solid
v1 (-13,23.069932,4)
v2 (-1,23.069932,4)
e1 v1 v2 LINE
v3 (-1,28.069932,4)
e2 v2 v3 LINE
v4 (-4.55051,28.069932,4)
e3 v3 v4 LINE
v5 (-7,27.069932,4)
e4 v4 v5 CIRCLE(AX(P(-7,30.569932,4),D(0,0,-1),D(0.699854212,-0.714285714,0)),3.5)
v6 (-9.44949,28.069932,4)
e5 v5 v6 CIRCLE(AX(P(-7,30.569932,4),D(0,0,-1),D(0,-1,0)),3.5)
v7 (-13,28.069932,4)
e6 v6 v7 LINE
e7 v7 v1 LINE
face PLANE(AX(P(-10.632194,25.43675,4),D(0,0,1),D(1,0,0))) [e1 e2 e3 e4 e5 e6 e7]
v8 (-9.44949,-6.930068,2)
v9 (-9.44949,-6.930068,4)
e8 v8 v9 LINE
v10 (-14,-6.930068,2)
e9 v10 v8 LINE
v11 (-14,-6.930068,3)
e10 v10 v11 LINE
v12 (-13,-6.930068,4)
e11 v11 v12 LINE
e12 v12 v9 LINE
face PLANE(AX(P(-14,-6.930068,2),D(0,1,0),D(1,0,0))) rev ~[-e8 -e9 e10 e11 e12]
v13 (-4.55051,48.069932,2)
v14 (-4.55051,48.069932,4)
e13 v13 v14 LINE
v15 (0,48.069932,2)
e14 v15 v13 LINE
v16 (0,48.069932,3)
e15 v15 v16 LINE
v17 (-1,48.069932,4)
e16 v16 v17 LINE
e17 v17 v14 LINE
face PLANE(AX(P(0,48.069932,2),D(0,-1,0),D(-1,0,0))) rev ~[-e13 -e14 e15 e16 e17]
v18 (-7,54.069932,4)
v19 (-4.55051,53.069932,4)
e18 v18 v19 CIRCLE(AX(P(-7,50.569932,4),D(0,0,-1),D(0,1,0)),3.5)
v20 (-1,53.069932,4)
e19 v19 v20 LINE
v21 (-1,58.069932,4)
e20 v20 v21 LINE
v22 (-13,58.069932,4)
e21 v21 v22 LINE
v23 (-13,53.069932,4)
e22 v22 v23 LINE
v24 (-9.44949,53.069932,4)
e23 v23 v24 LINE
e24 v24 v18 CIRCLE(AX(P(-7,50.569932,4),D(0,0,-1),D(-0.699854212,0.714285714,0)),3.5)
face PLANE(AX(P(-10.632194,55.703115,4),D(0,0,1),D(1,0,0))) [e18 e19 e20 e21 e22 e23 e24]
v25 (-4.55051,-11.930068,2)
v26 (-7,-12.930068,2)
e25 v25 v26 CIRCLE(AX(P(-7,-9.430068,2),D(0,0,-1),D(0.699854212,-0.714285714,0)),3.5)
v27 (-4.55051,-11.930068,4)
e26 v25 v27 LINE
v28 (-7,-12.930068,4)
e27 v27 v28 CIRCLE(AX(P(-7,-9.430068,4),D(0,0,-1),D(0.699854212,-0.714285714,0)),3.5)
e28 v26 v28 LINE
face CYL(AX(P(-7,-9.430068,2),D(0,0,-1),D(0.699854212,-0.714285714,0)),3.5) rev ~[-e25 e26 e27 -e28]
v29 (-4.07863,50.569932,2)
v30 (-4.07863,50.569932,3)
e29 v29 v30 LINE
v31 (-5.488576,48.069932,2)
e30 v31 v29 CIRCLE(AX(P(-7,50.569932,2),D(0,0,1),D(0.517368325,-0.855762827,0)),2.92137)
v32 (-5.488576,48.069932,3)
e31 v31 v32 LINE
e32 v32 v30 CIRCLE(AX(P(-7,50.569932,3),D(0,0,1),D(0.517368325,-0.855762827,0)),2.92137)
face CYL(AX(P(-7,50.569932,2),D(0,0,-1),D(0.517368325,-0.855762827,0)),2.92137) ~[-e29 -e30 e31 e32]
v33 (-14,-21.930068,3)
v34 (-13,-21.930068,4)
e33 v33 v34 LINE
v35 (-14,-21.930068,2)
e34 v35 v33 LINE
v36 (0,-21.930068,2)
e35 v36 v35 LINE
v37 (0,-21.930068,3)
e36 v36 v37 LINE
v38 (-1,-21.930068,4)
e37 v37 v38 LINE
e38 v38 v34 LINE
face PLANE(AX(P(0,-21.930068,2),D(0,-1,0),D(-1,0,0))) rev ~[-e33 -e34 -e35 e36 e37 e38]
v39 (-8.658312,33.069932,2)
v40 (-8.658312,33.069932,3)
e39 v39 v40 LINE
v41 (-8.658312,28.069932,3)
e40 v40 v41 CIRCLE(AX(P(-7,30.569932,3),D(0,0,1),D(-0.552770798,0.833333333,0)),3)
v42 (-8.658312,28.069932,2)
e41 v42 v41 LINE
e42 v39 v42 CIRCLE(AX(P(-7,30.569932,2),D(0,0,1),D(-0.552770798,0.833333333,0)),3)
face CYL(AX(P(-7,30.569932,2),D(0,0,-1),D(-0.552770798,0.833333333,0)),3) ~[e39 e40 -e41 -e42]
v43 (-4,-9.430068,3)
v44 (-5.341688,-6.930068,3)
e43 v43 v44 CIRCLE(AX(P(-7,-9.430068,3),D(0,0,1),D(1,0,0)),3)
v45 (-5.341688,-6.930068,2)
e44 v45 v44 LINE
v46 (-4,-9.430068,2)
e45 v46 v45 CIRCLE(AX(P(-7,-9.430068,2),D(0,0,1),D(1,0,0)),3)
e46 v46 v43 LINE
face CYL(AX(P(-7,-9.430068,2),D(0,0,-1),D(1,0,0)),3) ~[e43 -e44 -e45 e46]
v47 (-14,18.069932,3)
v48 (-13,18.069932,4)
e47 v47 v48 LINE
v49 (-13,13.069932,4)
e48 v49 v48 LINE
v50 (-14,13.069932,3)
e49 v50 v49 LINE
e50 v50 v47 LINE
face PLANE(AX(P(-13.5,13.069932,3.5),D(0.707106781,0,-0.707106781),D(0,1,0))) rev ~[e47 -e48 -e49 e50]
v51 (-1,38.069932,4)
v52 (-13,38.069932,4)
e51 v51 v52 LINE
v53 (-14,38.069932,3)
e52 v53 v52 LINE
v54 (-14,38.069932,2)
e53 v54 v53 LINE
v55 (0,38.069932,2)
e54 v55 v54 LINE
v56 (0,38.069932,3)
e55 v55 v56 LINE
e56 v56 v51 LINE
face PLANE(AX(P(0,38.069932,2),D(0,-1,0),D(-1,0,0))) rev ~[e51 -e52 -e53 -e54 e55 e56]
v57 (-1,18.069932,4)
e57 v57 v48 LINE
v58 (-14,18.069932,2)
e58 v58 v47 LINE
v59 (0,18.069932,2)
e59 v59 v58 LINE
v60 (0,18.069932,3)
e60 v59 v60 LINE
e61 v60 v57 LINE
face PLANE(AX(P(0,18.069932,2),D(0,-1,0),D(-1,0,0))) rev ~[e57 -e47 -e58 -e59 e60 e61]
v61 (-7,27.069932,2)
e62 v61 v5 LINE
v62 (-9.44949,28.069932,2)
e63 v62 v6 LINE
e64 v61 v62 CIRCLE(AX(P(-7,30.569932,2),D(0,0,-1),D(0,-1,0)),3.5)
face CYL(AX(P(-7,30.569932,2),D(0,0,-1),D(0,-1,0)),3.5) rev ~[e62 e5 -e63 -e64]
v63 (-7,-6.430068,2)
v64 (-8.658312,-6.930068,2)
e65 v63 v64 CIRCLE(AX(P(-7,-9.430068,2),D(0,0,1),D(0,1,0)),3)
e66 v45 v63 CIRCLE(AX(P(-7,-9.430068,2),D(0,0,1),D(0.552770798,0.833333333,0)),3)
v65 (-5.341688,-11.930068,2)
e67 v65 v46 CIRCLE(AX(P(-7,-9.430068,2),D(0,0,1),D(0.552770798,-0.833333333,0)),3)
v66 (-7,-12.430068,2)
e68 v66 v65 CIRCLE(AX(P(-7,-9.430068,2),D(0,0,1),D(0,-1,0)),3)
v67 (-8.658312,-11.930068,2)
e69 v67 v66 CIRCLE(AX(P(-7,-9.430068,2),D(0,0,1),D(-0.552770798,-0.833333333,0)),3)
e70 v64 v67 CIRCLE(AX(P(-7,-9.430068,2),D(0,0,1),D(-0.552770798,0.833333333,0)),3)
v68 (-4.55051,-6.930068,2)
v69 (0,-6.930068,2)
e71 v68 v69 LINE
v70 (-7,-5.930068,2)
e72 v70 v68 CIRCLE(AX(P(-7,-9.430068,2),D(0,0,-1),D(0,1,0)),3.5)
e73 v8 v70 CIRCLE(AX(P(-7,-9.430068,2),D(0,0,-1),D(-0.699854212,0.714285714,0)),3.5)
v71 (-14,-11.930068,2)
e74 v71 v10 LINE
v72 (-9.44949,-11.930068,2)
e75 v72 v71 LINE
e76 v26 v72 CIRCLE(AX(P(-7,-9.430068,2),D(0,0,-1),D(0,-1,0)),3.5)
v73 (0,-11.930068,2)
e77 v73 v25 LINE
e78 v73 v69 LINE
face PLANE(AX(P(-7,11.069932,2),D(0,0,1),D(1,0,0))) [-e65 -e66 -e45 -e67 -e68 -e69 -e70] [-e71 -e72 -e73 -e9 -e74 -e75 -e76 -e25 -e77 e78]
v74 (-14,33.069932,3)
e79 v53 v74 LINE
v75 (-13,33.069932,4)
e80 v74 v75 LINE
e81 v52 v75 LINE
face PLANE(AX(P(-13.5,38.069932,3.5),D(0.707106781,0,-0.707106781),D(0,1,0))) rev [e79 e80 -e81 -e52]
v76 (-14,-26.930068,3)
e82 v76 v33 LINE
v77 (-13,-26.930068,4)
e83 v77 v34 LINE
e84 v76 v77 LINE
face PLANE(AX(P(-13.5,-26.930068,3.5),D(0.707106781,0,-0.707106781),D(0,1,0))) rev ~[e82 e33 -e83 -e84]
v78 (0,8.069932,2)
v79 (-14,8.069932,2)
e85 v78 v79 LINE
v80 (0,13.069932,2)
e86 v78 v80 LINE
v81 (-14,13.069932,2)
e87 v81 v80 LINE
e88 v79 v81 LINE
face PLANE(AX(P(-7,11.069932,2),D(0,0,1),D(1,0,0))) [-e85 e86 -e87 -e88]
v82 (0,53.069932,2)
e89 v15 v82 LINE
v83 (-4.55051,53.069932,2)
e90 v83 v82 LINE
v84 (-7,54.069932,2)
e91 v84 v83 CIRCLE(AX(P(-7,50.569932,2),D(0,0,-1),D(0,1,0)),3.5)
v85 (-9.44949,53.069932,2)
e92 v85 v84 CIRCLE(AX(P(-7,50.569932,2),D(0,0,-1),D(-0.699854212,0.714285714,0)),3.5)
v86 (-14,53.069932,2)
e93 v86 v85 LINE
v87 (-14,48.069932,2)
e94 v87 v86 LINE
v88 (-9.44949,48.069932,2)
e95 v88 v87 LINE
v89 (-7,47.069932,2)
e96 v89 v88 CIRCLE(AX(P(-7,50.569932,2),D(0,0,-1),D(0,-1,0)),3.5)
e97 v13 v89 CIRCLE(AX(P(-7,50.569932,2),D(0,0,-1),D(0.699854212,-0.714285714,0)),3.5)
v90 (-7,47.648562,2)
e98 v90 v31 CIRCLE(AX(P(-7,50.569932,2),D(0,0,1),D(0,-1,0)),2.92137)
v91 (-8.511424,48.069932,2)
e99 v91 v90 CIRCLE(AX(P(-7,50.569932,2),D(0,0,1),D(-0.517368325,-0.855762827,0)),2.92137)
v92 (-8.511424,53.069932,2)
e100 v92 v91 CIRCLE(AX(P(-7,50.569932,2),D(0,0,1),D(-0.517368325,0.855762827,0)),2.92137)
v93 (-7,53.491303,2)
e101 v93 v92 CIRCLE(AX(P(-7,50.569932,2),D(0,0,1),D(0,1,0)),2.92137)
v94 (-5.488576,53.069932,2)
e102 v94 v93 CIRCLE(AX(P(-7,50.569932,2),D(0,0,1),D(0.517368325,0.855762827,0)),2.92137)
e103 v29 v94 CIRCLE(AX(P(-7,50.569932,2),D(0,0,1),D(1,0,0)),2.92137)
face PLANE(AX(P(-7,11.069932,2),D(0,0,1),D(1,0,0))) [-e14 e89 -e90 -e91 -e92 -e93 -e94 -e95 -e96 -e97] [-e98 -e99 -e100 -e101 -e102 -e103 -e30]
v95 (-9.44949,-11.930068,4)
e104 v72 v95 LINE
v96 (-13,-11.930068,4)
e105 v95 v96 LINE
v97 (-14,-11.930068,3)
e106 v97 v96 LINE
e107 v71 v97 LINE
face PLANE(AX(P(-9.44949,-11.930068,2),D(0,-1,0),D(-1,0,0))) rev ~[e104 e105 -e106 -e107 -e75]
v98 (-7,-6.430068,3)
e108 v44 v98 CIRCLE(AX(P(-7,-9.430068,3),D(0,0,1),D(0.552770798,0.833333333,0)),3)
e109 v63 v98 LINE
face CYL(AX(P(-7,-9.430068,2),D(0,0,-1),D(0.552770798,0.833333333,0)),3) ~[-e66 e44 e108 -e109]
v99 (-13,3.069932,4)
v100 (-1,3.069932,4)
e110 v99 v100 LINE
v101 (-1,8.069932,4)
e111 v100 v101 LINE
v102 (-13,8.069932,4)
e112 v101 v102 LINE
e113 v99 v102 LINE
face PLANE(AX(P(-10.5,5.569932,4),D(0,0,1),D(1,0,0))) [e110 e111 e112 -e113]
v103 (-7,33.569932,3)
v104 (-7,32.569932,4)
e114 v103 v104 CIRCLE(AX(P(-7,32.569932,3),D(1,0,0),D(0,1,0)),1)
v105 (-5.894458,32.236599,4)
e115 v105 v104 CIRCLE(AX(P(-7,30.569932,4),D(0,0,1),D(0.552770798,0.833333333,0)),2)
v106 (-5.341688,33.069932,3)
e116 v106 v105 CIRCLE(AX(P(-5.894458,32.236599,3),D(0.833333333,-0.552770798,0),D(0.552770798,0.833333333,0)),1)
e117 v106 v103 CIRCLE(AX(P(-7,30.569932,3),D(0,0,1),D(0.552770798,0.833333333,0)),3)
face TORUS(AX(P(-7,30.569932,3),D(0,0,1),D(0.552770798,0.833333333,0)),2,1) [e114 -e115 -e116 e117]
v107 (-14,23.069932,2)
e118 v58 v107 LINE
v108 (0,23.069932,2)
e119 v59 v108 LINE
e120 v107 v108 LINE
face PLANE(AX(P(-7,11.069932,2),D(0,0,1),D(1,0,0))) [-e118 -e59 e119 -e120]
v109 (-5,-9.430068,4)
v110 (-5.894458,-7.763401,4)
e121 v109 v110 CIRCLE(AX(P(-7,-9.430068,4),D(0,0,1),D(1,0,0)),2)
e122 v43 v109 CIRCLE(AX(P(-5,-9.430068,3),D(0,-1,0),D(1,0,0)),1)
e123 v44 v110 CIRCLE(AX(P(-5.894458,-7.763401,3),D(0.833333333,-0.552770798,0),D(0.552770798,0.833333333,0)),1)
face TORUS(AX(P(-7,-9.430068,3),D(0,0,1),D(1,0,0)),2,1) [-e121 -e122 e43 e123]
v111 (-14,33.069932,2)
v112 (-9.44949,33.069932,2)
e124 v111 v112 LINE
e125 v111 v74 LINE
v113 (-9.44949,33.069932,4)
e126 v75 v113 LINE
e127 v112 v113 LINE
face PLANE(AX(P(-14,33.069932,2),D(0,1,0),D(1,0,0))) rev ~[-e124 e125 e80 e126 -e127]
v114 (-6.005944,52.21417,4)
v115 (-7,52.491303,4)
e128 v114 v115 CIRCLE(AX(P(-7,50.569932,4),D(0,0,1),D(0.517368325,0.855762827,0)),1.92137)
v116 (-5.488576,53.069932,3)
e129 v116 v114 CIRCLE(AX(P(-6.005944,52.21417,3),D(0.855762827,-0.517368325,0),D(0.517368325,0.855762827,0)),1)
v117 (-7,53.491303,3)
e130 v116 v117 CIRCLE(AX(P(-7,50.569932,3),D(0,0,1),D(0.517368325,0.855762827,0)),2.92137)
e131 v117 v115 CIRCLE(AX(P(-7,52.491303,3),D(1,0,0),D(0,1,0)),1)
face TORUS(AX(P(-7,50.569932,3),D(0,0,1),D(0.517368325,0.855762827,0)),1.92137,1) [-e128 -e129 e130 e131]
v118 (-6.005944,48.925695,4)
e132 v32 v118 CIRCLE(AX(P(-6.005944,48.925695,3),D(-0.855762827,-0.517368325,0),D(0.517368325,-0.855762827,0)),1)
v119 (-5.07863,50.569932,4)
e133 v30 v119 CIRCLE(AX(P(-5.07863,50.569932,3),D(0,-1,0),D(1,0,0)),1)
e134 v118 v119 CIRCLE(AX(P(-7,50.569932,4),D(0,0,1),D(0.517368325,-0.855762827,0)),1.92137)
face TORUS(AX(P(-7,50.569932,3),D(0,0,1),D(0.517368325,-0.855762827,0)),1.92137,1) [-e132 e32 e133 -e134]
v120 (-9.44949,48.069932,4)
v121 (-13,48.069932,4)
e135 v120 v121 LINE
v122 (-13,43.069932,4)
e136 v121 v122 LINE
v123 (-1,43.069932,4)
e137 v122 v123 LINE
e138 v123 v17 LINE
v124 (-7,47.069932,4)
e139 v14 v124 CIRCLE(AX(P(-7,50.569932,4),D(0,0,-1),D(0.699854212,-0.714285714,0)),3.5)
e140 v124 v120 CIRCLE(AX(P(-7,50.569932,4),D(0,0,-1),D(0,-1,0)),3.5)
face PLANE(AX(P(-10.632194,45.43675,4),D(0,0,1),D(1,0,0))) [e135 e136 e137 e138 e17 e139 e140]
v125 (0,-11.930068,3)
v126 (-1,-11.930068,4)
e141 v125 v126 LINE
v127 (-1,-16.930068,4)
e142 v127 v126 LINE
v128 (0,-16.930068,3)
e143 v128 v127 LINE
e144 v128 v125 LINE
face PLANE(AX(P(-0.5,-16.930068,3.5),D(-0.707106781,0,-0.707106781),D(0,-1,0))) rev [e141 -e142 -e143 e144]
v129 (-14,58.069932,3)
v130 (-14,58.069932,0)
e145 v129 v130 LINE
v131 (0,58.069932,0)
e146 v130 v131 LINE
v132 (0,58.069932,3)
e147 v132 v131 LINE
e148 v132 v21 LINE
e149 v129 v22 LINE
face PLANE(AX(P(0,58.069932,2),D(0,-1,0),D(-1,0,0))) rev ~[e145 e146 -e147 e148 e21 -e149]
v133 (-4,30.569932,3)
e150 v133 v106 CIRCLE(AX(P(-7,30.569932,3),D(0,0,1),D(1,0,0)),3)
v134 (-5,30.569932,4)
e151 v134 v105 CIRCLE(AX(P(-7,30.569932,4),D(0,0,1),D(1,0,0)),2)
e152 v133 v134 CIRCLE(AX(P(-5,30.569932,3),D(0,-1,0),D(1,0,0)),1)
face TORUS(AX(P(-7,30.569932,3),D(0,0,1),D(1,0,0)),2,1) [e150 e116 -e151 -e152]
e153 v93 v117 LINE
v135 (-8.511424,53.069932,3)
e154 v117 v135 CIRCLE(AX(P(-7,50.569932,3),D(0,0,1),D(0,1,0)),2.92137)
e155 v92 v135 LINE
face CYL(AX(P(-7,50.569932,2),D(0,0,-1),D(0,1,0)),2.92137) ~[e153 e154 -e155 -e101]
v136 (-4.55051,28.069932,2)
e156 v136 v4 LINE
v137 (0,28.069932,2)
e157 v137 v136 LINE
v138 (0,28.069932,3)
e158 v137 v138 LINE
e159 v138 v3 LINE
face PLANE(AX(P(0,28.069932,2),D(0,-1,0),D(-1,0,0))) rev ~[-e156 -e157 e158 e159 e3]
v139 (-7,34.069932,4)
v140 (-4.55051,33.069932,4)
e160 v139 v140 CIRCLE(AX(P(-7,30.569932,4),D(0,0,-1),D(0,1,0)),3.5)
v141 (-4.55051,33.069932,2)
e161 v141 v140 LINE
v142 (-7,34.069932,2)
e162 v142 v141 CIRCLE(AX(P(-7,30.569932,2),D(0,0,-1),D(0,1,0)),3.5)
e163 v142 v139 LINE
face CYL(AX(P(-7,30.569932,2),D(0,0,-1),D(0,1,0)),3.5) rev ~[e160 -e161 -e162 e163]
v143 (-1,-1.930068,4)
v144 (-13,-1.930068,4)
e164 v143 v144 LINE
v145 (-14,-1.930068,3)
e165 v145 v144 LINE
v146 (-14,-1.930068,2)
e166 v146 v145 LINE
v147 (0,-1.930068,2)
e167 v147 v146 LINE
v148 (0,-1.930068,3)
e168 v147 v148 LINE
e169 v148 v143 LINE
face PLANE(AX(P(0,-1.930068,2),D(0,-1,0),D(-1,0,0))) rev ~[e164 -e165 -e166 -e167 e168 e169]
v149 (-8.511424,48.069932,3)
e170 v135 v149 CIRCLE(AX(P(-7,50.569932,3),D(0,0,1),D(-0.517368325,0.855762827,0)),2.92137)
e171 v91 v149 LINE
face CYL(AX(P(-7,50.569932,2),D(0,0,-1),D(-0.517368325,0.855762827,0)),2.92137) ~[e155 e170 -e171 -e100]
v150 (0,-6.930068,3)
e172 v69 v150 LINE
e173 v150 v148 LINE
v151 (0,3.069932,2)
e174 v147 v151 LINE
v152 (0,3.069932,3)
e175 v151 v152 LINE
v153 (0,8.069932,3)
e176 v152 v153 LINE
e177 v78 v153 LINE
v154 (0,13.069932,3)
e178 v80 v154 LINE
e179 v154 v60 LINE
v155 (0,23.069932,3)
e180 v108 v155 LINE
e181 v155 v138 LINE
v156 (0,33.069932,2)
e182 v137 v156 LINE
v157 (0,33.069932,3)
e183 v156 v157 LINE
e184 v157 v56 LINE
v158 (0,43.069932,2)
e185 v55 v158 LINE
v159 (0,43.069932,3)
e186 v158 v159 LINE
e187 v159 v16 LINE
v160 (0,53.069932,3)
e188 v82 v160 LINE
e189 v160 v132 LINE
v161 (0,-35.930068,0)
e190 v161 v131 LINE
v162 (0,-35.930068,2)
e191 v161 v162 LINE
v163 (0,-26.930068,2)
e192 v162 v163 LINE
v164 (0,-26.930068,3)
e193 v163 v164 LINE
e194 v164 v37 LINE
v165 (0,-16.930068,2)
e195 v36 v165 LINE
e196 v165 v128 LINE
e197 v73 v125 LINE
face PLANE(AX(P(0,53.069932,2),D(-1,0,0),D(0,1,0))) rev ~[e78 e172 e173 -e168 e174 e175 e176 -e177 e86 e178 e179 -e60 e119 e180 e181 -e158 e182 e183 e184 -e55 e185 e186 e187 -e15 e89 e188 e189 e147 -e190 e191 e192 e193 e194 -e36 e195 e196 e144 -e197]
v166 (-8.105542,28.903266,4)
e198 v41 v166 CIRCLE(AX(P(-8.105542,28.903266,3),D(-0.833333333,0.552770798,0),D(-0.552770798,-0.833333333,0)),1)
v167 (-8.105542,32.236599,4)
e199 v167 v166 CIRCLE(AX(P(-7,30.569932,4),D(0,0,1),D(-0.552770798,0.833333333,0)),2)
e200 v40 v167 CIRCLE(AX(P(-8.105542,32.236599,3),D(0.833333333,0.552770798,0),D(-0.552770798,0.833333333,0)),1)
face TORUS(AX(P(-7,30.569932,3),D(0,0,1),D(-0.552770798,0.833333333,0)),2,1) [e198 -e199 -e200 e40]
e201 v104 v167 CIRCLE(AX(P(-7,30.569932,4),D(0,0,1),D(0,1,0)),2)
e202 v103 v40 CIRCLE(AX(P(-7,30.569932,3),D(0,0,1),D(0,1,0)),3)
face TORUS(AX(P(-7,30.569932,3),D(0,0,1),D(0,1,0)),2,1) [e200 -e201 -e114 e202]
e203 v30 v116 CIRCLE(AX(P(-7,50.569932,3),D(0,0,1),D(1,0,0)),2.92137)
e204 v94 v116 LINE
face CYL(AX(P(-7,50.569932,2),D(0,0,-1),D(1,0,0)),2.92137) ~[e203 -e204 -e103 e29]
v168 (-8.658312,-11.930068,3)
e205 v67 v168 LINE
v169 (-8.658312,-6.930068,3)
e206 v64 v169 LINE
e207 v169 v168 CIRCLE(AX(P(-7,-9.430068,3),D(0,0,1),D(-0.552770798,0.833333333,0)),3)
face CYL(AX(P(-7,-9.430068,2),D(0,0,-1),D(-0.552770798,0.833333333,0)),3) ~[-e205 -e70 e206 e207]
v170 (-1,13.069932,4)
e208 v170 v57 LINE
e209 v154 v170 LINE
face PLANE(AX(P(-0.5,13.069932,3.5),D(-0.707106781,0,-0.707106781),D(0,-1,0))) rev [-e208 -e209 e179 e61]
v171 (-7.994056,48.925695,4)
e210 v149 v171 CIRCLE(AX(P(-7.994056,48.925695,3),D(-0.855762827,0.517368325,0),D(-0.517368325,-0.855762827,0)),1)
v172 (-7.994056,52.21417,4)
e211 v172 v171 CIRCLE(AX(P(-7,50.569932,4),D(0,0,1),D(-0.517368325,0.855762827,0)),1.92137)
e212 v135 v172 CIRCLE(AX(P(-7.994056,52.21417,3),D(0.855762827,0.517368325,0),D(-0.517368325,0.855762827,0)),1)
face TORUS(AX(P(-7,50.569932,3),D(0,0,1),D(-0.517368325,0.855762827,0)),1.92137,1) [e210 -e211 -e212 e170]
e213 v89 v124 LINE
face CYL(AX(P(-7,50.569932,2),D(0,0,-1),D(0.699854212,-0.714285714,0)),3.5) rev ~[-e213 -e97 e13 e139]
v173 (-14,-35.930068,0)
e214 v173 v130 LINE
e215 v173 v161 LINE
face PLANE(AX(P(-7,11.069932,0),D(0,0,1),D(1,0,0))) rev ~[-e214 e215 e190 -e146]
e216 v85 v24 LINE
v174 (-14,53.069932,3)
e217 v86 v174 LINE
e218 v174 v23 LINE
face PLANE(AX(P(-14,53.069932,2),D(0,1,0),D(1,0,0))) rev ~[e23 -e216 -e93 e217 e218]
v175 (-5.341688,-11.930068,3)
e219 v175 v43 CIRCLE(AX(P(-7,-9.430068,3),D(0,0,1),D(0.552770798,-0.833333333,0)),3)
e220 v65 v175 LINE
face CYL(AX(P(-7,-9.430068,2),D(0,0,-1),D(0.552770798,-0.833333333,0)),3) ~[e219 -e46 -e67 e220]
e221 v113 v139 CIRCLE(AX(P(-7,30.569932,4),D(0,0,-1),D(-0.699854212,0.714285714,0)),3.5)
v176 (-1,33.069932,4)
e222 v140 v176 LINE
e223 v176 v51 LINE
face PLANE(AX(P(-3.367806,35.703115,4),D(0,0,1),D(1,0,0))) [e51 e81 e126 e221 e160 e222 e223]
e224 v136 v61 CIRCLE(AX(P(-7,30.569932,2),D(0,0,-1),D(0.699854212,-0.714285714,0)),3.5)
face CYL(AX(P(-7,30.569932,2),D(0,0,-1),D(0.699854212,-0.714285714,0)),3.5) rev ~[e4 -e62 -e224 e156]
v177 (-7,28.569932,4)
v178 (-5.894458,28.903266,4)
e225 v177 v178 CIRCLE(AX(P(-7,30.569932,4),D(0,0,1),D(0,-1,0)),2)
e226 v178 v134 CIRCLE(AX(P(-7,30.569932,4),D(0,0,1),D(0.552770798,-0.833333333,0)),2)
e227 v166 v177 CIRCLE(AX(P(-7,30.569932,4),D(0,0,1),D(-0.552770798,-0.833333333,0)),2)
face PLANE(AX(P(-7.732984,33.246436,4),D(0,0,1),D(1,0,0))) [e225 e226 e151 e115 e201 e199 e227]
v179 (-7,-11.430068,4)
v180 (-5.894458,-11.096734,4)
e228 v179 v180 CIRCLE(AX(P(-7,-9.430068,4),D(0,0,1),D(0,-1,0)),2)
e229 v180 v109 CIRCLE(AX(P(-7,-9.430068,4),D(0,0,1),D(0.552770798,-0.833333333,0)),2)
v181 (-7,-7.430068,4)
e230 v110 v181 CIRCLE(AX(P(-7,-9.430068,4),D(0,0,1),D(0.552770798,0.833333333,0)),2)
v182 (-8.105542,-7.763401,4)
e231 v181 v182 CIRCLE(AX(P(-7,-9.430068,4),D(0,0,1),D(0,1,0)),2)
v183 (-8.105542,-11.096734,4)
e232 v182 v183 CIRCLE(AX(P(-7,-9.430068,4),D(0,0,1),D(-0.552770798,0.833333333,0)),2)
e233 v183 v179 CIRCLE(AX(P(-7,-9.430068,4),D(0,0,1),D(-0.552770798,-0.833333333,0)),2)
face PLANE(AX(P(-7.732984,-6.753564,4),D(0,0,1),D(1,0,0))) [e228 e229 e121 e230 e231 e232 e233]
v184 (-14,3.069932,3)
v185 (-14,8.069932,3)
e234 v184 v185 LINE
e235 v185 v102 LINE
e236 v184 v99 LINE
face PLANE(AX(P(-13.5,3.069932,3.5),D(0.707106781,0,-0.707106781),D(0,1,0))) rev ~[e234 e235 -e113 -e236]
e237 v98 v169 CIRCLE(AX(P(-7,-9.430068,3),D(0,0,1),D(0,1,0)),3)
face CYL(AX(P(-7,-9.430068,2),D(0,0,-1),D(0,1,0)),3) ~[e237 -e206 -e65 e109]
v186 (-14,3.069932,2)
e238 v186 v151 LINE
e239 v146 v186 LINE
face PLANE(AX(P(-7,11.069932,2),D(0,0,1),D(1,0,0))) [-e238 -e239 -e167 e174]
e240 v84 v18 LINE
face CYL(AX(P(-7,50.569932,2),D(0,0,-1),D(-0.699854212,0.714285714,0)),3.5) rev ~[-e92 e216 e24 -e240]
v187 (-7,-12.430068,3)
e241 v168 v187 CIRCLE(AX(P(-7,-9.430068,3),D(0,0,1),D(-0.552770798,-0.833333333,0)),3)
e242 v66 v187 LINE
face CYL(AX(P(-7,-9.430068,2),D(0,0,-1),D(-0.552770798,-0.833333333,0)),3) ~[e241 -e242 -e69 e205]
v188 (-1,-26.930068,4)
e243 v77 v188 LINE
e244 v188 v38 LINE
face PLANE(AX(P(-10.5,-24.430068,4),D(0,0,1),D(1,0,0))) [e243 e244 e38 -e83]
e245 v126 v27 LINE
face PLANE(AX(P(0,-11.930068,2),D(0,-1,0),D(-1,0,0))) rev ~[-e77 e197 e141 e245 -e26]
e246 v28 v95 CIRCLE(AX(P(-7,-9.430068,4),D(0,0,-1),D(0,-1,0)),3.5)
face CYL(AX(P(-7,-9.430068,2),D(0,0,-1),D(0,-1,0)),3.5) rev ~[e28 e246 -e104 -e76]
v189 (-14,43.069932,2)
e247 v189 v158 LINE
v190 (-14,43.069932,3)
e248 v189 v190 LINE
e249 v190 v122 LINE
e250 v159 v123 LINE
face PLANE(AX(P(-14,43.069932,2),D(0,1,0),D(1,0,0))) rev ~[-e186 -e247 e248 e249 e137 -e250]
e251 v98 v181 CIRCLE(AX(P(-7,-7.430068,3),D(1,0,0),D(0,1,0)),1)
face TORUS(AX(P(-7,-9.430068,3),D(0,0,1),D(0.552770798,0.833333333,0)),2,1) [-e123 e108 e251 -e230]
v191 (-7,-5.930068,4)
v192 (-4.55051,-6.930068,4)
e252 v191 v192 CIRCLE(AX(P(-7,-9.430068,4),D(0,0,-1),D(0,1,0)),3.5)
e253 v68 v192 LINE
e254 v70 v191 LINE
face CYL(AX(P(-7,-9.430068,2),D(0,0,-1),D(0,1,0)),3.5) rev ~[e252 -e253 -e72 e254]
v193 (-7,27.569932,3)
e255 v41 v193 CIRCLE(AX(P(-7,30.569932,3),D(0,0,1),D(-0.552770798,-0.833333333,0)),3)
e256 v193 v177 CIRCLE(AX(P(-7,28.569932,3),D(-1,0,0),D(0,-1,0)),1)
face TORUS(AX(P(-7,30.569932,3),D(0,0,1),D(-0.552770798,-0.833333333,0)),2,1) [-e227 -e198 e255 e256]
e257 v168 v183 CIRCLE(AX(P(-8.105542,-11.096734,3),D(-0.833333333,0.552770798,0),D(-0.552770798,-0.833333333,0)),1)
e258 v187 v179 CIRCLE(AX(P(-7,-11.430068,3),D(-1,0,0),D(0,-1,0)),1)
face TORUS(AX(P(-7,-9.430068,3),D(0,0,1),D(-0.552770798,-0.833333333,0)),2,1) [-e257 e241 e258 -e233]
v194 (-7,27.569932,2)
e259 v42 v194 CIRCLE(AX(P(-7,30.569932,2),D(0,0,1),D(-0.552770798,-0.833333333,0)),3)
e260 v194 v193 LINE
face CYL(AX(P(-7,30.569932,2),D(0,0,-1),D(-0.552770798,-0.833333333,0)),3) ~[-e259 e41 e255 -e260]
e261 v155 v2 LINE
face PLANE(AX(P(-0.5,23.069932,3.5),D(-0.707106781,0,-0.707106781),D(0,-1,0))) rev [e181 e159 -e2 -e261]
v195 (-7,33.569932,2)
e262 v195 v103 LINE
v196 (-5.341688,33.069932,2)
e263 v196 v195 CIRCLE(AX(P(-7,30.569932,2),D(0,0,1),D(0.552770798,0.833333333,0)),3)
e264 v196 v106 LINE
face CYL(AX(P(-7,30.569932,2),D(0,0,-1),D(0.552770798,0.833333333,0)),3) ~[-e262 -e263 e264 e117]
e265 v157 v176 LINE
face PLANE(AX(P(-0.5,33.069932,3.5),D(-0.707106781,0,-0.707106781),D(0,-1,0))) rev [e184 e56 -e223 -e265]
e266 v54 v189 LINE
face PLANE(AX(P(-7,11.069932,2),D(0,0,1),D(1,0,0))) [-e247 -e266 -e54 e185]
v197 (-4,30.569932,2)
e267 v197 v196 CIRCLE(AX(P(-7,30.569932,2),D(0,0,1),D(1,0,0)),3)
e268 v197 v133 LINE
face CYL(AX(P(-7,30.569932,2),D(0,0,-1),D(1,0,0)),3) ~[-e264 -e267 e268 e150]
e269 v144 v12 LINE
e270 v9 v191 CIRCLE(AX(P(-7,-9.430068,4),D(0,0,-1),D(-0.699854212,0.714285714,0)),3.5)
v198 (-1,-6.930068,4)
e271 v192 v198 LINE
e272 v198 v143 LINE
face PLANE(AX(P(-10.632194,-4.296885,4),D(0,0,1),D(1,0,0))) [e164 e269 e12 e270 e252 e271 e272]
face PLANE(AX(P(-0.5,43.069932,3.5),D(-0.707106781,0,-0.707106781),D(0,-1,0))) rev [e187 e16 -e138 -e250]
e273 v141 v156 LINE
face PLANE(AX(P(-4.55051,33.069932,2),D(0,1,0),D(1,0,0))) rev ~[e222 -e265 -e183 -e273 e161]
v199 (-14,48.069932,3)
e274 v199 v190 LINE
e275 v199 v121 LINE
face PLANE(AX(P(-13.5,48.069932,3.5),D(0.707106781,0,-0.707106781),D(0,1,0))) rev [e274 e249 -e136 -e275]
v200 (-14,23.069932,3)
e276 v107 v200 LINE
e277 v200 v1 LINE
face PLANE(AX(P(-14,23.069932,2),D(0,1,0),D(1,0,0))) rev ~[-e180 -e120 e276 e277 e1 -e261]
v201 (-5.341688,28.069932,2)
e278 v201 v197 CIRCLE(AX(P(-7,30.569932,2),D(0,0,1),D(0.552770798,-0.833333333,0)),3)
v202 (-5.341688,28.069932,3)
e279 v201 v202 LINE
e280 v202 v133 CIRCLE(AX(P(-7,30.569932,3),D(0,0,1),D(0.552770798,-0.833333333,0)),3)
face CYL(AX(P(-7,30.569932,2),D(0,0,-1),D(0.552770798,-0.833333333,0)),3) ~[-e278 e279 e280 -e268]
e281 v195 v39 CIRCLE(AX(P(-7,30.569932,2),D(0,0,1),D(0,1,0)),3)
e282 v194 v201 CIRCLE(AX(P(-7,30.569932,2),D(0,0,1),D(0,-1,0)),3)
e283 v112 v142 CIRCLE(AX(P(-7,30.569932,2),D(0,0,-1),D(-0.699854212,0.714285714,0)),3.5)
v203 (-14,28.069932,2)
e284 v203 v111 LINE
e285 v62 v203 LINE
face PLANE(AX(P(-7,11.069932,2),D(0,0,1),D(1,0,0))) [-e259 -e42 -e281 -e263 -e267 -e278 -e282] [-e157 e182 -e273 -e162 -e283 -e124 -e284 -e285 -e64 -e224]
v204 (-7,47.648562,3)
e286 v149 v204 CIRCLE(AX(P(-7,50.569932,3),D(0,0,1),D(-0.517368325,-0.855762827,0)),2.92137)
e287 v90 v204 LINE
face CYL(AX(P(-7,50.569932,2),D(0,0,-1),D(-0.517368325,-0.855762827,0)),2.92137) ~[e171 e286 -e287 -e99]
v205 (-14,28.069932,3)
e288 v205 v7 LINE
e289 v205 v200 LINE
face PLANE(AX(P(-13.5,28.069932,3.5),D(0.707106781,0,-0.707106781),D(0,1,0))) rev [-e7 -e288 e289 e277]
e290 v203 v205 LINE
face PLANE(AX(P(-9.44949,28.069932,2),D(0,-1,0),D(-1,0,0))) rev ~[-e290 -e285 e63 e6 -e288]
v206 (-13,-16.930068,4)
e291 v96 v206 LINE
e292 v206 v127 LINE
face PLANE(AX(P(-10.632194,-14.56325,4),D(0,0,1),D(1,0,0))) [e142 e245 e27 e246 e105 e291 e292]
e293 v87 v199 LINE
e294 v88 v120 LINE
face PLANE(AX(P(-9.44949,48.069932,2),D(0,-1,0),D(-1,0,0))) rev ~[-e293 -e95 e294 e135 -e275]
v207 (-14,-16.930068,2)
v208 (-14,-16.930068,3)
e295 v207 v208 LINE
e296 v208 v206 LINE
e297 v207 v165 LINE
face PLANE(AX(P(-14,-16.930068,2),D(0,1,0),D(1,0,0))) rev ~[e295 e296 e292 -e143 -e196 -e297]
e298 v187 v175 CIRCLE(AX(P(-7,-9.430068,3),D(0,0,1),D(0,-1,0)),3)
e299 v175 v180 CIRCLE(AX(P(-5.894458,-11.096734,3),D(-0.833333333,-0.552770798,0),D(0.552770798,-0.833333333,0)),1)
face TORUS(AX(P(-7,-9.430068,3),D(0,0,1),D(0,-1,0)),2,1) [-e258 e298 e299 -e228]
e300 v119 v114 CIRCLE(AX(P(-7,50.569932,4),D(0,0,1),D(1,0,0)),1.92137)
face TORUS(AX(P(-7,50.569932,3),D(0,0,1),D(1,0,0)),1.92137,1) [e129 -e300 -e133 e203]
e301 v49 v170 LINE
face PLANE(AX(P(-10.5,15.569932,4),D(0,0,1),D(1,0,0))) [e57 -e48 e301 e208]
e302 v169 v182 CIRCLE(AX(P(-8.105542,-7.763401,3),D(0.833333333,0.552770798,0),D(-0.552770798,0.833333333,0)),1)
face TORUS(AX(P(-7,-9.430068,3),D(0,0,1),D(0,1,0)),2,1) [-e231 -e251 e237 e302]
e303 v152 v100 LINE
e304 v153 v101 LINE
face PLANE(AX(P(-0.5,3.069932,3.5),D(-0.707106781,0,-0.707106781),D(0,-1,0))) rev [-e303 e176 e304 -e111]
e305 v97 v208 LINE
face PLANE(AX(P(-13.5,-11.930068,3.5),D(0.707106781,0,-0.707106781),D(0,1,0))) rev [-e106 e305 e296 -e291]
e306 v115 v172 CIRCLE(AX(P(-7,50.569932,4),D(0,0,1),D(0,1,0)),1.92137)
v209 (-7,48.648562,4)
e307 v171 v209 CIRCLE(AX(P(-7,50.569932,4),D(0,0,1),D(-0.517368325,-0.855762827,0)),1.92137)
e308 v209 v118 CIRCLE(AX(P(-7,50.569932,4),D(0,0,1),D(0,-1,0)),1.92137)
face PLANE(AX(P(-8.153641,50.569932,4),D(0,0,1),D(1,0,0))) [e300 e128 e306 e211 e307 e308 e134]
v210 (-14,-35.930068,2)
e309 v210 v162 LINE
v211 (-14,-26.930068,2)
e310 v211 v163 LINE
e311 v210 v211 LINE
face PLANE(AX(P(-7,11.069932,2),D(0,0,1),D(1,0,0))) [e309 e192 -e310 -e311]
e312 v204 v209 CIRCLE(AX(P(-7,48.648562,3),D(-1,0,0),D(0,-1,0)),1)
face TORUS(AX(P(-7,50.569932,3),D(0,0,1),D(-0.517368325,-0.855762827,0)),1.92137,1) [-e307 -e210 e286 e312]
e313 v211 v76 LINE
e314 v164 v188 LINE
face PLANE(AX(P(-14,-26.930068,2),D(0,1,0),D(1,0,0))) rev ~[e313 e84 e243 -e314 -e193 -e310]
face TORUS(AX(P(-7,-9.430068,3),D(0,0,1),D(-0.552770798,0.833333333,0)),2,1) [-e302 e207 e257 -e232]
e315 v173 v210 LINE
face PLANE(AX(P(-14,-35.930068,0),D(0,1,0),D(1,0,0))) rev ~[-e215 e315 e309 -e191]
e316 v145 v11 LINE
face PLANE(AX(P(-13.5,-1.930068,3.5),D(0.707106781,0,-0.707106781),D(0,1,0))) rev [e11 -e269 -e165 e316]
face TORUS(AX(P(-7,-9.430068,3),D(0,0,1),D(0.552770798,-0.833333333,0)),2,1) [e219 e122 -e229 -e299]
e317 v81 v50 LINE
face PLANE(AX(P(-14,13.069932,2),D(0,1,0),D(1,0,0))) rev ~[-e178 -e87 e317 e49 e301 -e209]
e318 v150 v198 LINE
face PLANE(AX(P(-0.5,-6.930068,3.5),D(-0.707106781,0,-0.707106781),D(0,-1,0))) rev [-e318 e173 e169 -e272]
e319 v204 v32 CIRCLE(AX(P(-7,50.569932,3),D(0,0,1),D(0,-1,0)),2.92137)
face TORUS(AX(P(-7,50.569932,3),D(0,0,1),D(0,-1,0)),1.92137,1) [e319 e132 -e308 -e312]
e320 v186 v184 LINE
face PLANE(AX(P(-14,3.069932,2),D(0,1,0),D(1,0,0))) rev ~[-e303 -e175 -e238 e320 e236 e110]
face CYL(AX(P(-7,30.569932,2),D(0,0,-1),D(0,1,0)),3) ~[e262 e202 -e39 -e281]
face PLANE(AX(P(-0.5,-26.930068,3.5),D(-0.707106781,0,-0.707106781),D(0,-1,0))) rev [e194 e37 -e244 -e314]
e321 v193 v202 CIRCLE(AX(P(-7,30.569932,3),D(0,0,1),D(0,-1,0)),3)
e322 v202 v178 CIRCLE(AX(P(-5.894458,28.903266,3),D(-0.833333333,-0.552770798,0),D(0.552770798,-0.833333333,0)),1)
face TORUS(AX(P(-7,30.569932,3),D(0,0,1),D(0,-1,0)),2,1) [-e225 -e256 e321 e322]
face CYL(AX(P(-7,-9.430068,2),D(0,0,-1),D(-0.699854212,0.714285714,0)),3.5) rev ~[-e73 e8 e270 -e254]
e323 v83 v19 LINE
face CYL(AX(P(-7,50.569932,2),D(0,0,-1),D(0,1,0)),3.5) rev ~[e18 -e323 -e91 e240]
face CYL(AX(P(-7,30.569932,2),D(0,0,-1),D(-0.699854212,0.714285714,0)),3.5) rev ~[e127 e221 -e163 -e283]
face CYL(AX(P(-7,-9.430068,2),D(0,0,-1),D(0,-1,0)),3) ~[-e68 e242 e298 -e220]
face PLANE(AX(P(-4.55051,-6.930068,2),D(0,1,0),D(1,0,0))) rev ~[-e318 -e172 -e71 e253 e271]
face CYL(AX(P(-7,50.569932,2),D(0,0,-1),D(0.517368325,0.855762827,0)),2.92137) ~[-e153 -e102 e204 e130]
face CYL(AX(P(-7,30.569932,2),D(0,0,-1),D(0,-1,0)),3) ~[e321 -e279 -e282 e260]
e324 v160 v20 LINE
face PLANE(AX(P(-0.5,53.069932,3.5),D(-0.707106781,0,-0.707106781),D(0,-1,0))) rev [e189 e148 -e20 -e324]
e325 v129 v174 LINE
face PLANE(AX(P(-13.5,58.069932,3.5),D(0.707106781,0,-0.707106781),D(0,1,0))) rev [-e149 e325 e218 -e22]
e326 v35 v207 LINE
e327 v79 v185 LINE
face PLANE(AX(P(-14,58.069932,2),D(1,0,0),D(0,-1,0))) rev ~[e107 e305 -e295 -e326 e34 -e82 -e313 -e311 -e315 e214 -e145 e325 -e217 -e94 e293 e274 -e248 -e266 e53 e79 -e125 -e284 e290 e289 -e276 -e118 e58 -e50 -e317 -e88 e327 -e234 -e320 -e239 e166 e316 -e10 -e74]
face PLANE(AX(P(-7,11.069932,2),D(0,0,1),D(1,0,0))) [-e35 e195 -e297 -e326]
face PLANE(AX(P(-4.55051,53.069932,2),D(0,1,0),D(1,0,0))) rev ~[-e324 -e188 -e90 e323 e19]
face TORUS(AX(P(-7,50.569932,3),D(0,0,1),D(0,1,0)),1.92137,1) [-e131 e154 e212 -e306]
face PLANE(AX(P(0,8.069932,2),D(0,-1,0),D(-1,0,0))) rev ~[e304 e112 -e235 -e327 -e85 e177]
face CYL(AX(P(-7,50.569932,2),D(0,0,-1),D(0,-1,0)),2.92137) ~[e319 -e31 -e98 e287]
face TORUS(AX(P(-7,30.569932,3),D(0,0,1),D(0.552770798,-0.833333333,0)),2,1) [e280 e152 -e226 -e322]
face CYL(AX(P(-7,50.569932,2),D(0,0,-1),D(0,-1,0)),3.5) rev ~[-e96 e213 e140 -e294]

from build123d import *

# Parameters (mm, degrees)
F0_W     = 14
F0_H     = 94
F1_DEPTH = 2
F2_W     = 7
F2_H     = 5
F3_DEPTH = 2
F4_SIZE  = 1
F5_R     = 1


with BuildPart() as f1:
    # F0 (on Top) → F1 (new body)
    with BuildSketch(Plane.XY):
        with Locations((-7, 11.0699324605)):
            Rectangle(F0_W, F0_H)
    extrude(amount=F1_DEPTH)

    # F2 (on face) → F3 (join)
    with BuildSketch(Plane.XY.offset(2)):
        with BuildLine():
            Line((-7, 58.0699324605), (-14, 58.0699324605))
            Line((-14, 58.0699324605), (-14, 53.0699324605))
            Line((-14, 53.0699324605), (-9.4494897428, 53.0699324605))
            ThreePointArc((-9.4494897428, 53.0699324605), (-8.3228756555, 53.8103028097), (-7, 54.0699324605))
            Line((-7, 54.0699324605), (-7, 58.0699324605))
        make_face()
        with BuildLine():
            Line((0, 58.0699324605), (-7, 58.0699324605))
            Line((-7, 58.0699324605), (-7, 54.0699324605))
            ThreePointArc((-7, 54.0699324605), (-5.6771243445, 53.8103028097), (-4.5505102572, 53.0699324605))
            Line((-4.5505102572, 53.0699324605), (0, 53.0699324605))
            Line((0, 53.0699324605), (0, 58.0699324605))
        make_face()
        with BuildLine():
            Line((-9.4494897428, 48.0699324605), (-14, 48.0699324605))
            Line((-14, 48.0699324605), (-14, 43.0699324605))
            Line((-14, 43.0699324605), (-7, 43.0699324605))
            Line((-7, 43.0699324605), (-7, 47.0699324605))
            ThreePointArc((-7, 47.0699324605), (-8.3228756555, 47.3295621113), (-9.4494897428, 48.0699324605))
        make_face()
        with BuildLine():
            ThreePointArc((-4.5505102572, 48.0699324605), (-5.6771243445, 47.3295621113), (-7, 47.0699324605))
            Line((-7, 47.0699324605), (-7, 43.0699324605))
            Line((-7, 43.0699324605), (0, 43.0699324605))
            Line((0, 43.0699324605), (0, 48.0699324605))
            Line((0, 48.0699324605), (-4.5505102572, 48.0699324605))
        make_face()
        with BuildLine():
            Line((0, 38.0699324605), (-7, 38.0699324605))
            Line((-7, 38.0699324605), (-7, 34.0699324605))
            ThreePointArc((-7, 34.0699324605), (-5.6771243445, 33.8103028097), (-4.5505102572, 33.0699324605))
            Line((-4.5505102572, 33.0699324605), (0, 33.0699324605))
            Line((0, 33.0699324605), (0, 38.0699324605))
        make_face()
        with BuildLine():
            Line((-7, 38.0699324605), (-14, 38.0699324605))
            Line((-14, 38.0699324605), (-14, 33.0699324605))
            Line((-14, 33.0699324605), (-9.4494897428, 33.0699324605))
            ThreePointArc((-9.4494897428, 33.0699324605), (-8.3228756555, 33.8103028097), (-7, 34.0699324605))
            Line((-7, 34.0699324605), (-7, 38.0699324605))
        make_face()
        with BuildLine():
            Line((-9.4494897428, 28.0699324605), (-14, 28.0699324605))
            Line((-14, 28.0699324605), (-14, 23.0699324605))
            Line((-14, 23.0699324605), (-7, 23.0699324605))
            Line((-7, 23.0699324605), (-7, 27.0699324605))
            ThreePointArc((-7, 27.0699324605), (-8.3228756555, 27.3295621113), (-9.4494897428, 28.0699324605))
        make_face()
        with BuildLine():
            Line((0, 23.0699324605), (0, 28.0699324605))
            Line((0, 28.0699324605), (-4.5505102572, 28.0699324605))
            ThreePointArc((-4.5505102572, 28.0699324605), (-5.6771243445, 27.3295621113), (-7, 27.0699324605))
            Line((-7, 27.0699324605), (-7, 23.0699324605))
            Line((-7, 23.0699324605), (0, 23.0699324605))
        make_face()
        with Locations((-10.5, 15.5699324605)):
            Rectangle(F2_W, F2_H)
        with Locations((-3.5, 15.5699324605)):
            Rectangle(F2_W, F2_H)
        with Locations((-10.5, 5.5699324605)):
            Rectangle(F2_W, F2_H)
        with Locations((-3.5, 5.5699324605)):
            Rectangle(F2_W, F2_H)
        with BuildLine():
            Line((-7, -1.9300675395), (-14, -1.9300675395))
            Line((-14, -1.9300675395), (-14, -6.9300675395))
            Line((-14, -6.9300675395), (-9.4494897428, -6.9300675395))
            ThreePointArc((-9.4494897428, -6.9300675395), (-8.3228756555, -6.1896971903), (-7, -5.9300675395))
            Line((-7, -5.9300675395), (-7, -1.9300675395))
        make_face()
        with BuildLine():
            Line((0, -1.9300675395), (-7, -1.9300675395))
            Line((-7, -1.9300675395), (-7, -5.9300675395))
            ThreePointArc((-7, -5.9300675395), (-5.6771243445, -6.1896971903), (-4.5505102572, -6.9300675395))
            Line((-4.5505102572, -6.9300675395), (0, -6.9300675395))
            Line((0, -6.9300675395), (0, -1.9300675395))
        make_face()
        with BuildLine():
            Line((-9.4494897428, -11.9300675395), (-14, -11.9300675395))
            Line((-14, -11.9300675395), (-14, -16.9300675395))
            Line((-14, -16.9300675395), (-7, -16.9300675395))
            Line((-7, -16.9300675395), (-7, -12.9300675395))
            ThreePointArc((-7, -12.9300675395), (-8.3228756555, -12.6704378887), (-9.4494897428, -11.9300675395))
        make_face()
        with BuildLine():
            Line((0, -16.9300675395), (0, -11.9300675395))
            Line((0, -11.9300675395), (-4.5505102572, -11.9300675395))
            ThreePointArc((-4.5505102572, -11.9300675395), (-5.6771243445, -12.6704378887), (-7, -12.9300675395))
            Line((-7, -12.9300675395), (-7, -16.9300675395))
            Line((-7, -16.9300675395), (0, -16.9300675395))
        make_face()
        with Locations((-10.5, -24.4300675395)):
            Rectangle(F2_W, F2_H)
        with Locations((-3.5, -24.4300675395)):
            Rectangle(F2_W, F2_H)
        with BuildLine():
            Line((-7, 53.0699324605), (-8.5114243945, 53.0699324605))
            ThreePointArc((-8.5114243945, 53.0699324605), (-9.9213701751, 50.5699324605), (-8.5114243945, 48.0699324605))
            Line((-8.5114243945, 48.0699324605), (-7, 48.0699324605))
            Line((-7, 48.0699324605), (-7, 53.0699324605))
        make_face()
        with BuildLine():
            Line((-5.4885756055, 53.0699324605), (-7, 53.0699324605))
            Line((-7, 53.0699324605), (-7, 48.0699324605))
            Line((-7, 48.0699324605), (-5.4885756055, 48.0699324605))
            ThreePointArc((-5.4885756055, 48.0699324605), (-4.455414194, 49.1348412522), (-4.0786298249, 50.5699324605))
            ThreePointArc((-4.0786298249, 50.5699324605), (-4.455414194, 52.0050236688), (-5.4885756055, 53.0699324605))
        make_face()
        with BuildLine():
            ThreePointArc((-5.4885756055, 53.0699324605), (-6.2154688463, 53.3839890642), (-7, 53.4913026356))
            Line((-7, 53.4913026356), (-7, 53.0699324605))
            Line((-7, 53.0699324605), (-5.4885756055, 53.0699324605))
        make_face()
        with BuildLine():
            ThreePointArc((-7, 53.4913026356), (-7.7845311537, 53.3839890642), (-8.5114243945, 53.0699324605))
            Line((-8.5114243945, 53.0699324605), (-7, 53.0699324605))
            Line((-7, 53.0699324605), (-7, 53.4913026356))
        make_face()
        with BuildLine():
            Line((-7, 48.0699324605), (-8.5114243945, 48.0699324605))
            ThreePointArc((-8.5114243945, 48.0699324605), (-7.7845311537, 47.7558758567), (-7, 47.6485622853))
            Line((-7, 47.6485622853), (-7, 48.0699324605))
        make_face()
        with BuildLine():
            Line((-5.4885756055, 48.0699324605), (-7, 48.0699324605))
            Line((-7, 48.0699324605), (-7, 47.6485622853))
            ThreePointArc((-7, 47.6485622853), (-6.2154688463, 47.7558758567), (-5.4885756055, 48.0699324605))
        make_face()
        with BuildLine():
            Line((-7, 33.0699324605), (-7, 33.5699324605))
            ThreePointArc((-7, 33.5699324605), (-7.8660254038, 33.4422137837), (-8.6583123952, 33.0699324605))
            Line((-8.6583123952, 33.0699324605), (-7, 33.0699324605))
        make_face()
        with BuildLine():
            ThreePointArc((-5.3416876048, 33.0699324605), (-6.1339745962, 33.4422137837), (-7, 33.5699324605))
            Line((-7, 33.5699324605), (-7, 33.0699324605))
            Line((-7, 33.0699324605), (-5.3416876048, 33.0699324605))
        make_face()
        with BuildLine():
            Line((-5.3416876048, 33.0699324605), (-7, 33.0699324605))
            Line((-7, 33.0699324605), (-7, 28.0699324605))
            Line((-7, 28.0699324605), (-5.3416876048, 28.0699324605))
            ThreePointArc((-5.3416876048, 28.0699324605), (-4.3566179631, 29.151295295), (-4, 30.5699324605))
            ThreePointArc((-4, 30.5699324605), (-4.3566179631, 31.9885696259), (-5.3416876048, 33.0699324605))
        make_face()
        with BuildLine():
            Line((-7, 33.0699324605), (-8.6583123952, 33.0699324605))
            ThreePointArc((-8.6583123952, 33.0699324605), (-10, 30.5699324605), (-8.6583123952, 28.0699324605))
            Line((-8.6583123952, 28.0699324605), (-7, 28.0699324605))
            Line((-7, 28.0699324605), (-7, 33.0699324605))
        make_face()
        with BuildLine():
            Line((-7, 28.0699324605), (-8.6583123952, 28.0699324605))
            ThreePointArc((-8.6583123952, 28.0699324605), (-7.8660254038, 27.6976511372), (-7, 27.5699324605))
            Line((-7, 27.5699324605), (-7, 28.0699324605))
        make_face()
        with BuildLine():
            Line((-5.3416876048, 28.0699324605), (-7, 28.0699324605))
            Line((-7, 28.0699324605), (-7, 27.5699324605))
            ThreePointArc((-7, 27.5699324605), (-6.1339745962, 27.6976511372), (-5.3416876048, 28.0699324605))
        make_face()
        with BuildLine():
            Line((-7, -6.9300675395), (-7, -6.4300675395))
            ThreePointArc((-7, -6.4300675395), (-7.8660254038, -6.5577862163), (-8.6583123952, -6.9300675395))
            Line((-8.6583123952, -6.9300675395), (-7, -6.9300675395))
        make_face()
        with BuildLine():
            ThreePointArc((-5.3416876048, -6.9300675395), (-6.1339745962, -6.5577862163), (-7, -6.4300675395))
            Line((-7, -6.4300675395), (-7, -6.9300675395))
            Line((-7, -6.9300675395), (-5.3416876048, -6.9300675395))
        make_face()
        with BuildLine():
            Line((-5.3416876048, -6.9300675395), (-7, -6.9300675395))
            Line((-7, -6.9300675395), (-7, -11.9300675395))
            Line((-7, -11.9300675395), (-5.3416876048, -11.9300675395))
            ThreePointArc((-5.3416876048, -11.9300675395), (-4.3566179631, -10.848704705), (-4, -9.4300675395))
            ThreePointArc((-4, -9.4300675395), (-4.3566179631, -8.0114303741), (-5.3416876048, -6.9300675395))
        make_face()
        with BuildLine():
            Line((-7, -6.9300675395), (-8.6583123952, -6.9300675395))
            ThreePointArc((-8.6583123952, -6.9300675395), (-10, -9.4300675395), (-8.6583123952, -11.9300675395))
            Line((-8.6583123952, -11.9300675395), (-7, -11.9300675395))
            Line((-7, -11.9300675395), (-7, -6.9300675395))
        make_face()
        with BuildLine():
            Line((-7, -11.9300675395), (-8.6583123952, -11.9300675395))
            ThreePointArc((-8.6583123952, -11.9300675395), (-7.8660254038, -12.3023488628), (-7, -12.4300675395))
            Line((-7, -12.4300675395), (-7, -11.9300675395))
        make_face()
        with BuildLine():
            Line((-5.3416876048, -11.9300675395), (-7, -11.9300675395))
            Line((-7, -11.9300675395), (-7, -12.4300675395))
            ThreePointArc((-7, -12.4300675395), (-6.1339745962, -12.3023488628), (-5.3416876048, -11.9300675395))
        make_face()
    extrude(amount=F3_DEPTH)

    # F4
    f4_edges = [f1.edges().sort_by_distance(p)[0] for p in [
        (-14, 55.569932, 4),
        (-14, 45.569932, 4),
        (-14, 35.569932, 4),
        (-14, 25.569932, 4),
        (-14, 15.569932, 4),
        (-14, 5.569932, 4),
        (-14, -4.430068, 4),
        (-14, -14.430068, 4),
        (-14, -24.430068, 4),
        (0, -24.430068, 4),
        (0, -14.430068, 4),
        (0, -4.430068, 4),
        (0, 5.569932, 4),
        (0, 15.569932, 4),
        (0, 25.569932, 4),
        (0, 35.569932, 4),
        (0, 45.569932, 4),
        (0, 55.569932, 4),
    ]]
    chamfer(f4_edges, length=F4_SIZE)

    # F5
    f5_edges = [f1.edges().sort_by_distance(p)[0] for p in [
        (-5.341688, -11.930068, 4),
        (-5.341688, 28.069932, 4),
        (-5.488576, 53.069932, 4),
    ]]
    fillet(f5_edges, radius=F5_R)


solid = f1.part
